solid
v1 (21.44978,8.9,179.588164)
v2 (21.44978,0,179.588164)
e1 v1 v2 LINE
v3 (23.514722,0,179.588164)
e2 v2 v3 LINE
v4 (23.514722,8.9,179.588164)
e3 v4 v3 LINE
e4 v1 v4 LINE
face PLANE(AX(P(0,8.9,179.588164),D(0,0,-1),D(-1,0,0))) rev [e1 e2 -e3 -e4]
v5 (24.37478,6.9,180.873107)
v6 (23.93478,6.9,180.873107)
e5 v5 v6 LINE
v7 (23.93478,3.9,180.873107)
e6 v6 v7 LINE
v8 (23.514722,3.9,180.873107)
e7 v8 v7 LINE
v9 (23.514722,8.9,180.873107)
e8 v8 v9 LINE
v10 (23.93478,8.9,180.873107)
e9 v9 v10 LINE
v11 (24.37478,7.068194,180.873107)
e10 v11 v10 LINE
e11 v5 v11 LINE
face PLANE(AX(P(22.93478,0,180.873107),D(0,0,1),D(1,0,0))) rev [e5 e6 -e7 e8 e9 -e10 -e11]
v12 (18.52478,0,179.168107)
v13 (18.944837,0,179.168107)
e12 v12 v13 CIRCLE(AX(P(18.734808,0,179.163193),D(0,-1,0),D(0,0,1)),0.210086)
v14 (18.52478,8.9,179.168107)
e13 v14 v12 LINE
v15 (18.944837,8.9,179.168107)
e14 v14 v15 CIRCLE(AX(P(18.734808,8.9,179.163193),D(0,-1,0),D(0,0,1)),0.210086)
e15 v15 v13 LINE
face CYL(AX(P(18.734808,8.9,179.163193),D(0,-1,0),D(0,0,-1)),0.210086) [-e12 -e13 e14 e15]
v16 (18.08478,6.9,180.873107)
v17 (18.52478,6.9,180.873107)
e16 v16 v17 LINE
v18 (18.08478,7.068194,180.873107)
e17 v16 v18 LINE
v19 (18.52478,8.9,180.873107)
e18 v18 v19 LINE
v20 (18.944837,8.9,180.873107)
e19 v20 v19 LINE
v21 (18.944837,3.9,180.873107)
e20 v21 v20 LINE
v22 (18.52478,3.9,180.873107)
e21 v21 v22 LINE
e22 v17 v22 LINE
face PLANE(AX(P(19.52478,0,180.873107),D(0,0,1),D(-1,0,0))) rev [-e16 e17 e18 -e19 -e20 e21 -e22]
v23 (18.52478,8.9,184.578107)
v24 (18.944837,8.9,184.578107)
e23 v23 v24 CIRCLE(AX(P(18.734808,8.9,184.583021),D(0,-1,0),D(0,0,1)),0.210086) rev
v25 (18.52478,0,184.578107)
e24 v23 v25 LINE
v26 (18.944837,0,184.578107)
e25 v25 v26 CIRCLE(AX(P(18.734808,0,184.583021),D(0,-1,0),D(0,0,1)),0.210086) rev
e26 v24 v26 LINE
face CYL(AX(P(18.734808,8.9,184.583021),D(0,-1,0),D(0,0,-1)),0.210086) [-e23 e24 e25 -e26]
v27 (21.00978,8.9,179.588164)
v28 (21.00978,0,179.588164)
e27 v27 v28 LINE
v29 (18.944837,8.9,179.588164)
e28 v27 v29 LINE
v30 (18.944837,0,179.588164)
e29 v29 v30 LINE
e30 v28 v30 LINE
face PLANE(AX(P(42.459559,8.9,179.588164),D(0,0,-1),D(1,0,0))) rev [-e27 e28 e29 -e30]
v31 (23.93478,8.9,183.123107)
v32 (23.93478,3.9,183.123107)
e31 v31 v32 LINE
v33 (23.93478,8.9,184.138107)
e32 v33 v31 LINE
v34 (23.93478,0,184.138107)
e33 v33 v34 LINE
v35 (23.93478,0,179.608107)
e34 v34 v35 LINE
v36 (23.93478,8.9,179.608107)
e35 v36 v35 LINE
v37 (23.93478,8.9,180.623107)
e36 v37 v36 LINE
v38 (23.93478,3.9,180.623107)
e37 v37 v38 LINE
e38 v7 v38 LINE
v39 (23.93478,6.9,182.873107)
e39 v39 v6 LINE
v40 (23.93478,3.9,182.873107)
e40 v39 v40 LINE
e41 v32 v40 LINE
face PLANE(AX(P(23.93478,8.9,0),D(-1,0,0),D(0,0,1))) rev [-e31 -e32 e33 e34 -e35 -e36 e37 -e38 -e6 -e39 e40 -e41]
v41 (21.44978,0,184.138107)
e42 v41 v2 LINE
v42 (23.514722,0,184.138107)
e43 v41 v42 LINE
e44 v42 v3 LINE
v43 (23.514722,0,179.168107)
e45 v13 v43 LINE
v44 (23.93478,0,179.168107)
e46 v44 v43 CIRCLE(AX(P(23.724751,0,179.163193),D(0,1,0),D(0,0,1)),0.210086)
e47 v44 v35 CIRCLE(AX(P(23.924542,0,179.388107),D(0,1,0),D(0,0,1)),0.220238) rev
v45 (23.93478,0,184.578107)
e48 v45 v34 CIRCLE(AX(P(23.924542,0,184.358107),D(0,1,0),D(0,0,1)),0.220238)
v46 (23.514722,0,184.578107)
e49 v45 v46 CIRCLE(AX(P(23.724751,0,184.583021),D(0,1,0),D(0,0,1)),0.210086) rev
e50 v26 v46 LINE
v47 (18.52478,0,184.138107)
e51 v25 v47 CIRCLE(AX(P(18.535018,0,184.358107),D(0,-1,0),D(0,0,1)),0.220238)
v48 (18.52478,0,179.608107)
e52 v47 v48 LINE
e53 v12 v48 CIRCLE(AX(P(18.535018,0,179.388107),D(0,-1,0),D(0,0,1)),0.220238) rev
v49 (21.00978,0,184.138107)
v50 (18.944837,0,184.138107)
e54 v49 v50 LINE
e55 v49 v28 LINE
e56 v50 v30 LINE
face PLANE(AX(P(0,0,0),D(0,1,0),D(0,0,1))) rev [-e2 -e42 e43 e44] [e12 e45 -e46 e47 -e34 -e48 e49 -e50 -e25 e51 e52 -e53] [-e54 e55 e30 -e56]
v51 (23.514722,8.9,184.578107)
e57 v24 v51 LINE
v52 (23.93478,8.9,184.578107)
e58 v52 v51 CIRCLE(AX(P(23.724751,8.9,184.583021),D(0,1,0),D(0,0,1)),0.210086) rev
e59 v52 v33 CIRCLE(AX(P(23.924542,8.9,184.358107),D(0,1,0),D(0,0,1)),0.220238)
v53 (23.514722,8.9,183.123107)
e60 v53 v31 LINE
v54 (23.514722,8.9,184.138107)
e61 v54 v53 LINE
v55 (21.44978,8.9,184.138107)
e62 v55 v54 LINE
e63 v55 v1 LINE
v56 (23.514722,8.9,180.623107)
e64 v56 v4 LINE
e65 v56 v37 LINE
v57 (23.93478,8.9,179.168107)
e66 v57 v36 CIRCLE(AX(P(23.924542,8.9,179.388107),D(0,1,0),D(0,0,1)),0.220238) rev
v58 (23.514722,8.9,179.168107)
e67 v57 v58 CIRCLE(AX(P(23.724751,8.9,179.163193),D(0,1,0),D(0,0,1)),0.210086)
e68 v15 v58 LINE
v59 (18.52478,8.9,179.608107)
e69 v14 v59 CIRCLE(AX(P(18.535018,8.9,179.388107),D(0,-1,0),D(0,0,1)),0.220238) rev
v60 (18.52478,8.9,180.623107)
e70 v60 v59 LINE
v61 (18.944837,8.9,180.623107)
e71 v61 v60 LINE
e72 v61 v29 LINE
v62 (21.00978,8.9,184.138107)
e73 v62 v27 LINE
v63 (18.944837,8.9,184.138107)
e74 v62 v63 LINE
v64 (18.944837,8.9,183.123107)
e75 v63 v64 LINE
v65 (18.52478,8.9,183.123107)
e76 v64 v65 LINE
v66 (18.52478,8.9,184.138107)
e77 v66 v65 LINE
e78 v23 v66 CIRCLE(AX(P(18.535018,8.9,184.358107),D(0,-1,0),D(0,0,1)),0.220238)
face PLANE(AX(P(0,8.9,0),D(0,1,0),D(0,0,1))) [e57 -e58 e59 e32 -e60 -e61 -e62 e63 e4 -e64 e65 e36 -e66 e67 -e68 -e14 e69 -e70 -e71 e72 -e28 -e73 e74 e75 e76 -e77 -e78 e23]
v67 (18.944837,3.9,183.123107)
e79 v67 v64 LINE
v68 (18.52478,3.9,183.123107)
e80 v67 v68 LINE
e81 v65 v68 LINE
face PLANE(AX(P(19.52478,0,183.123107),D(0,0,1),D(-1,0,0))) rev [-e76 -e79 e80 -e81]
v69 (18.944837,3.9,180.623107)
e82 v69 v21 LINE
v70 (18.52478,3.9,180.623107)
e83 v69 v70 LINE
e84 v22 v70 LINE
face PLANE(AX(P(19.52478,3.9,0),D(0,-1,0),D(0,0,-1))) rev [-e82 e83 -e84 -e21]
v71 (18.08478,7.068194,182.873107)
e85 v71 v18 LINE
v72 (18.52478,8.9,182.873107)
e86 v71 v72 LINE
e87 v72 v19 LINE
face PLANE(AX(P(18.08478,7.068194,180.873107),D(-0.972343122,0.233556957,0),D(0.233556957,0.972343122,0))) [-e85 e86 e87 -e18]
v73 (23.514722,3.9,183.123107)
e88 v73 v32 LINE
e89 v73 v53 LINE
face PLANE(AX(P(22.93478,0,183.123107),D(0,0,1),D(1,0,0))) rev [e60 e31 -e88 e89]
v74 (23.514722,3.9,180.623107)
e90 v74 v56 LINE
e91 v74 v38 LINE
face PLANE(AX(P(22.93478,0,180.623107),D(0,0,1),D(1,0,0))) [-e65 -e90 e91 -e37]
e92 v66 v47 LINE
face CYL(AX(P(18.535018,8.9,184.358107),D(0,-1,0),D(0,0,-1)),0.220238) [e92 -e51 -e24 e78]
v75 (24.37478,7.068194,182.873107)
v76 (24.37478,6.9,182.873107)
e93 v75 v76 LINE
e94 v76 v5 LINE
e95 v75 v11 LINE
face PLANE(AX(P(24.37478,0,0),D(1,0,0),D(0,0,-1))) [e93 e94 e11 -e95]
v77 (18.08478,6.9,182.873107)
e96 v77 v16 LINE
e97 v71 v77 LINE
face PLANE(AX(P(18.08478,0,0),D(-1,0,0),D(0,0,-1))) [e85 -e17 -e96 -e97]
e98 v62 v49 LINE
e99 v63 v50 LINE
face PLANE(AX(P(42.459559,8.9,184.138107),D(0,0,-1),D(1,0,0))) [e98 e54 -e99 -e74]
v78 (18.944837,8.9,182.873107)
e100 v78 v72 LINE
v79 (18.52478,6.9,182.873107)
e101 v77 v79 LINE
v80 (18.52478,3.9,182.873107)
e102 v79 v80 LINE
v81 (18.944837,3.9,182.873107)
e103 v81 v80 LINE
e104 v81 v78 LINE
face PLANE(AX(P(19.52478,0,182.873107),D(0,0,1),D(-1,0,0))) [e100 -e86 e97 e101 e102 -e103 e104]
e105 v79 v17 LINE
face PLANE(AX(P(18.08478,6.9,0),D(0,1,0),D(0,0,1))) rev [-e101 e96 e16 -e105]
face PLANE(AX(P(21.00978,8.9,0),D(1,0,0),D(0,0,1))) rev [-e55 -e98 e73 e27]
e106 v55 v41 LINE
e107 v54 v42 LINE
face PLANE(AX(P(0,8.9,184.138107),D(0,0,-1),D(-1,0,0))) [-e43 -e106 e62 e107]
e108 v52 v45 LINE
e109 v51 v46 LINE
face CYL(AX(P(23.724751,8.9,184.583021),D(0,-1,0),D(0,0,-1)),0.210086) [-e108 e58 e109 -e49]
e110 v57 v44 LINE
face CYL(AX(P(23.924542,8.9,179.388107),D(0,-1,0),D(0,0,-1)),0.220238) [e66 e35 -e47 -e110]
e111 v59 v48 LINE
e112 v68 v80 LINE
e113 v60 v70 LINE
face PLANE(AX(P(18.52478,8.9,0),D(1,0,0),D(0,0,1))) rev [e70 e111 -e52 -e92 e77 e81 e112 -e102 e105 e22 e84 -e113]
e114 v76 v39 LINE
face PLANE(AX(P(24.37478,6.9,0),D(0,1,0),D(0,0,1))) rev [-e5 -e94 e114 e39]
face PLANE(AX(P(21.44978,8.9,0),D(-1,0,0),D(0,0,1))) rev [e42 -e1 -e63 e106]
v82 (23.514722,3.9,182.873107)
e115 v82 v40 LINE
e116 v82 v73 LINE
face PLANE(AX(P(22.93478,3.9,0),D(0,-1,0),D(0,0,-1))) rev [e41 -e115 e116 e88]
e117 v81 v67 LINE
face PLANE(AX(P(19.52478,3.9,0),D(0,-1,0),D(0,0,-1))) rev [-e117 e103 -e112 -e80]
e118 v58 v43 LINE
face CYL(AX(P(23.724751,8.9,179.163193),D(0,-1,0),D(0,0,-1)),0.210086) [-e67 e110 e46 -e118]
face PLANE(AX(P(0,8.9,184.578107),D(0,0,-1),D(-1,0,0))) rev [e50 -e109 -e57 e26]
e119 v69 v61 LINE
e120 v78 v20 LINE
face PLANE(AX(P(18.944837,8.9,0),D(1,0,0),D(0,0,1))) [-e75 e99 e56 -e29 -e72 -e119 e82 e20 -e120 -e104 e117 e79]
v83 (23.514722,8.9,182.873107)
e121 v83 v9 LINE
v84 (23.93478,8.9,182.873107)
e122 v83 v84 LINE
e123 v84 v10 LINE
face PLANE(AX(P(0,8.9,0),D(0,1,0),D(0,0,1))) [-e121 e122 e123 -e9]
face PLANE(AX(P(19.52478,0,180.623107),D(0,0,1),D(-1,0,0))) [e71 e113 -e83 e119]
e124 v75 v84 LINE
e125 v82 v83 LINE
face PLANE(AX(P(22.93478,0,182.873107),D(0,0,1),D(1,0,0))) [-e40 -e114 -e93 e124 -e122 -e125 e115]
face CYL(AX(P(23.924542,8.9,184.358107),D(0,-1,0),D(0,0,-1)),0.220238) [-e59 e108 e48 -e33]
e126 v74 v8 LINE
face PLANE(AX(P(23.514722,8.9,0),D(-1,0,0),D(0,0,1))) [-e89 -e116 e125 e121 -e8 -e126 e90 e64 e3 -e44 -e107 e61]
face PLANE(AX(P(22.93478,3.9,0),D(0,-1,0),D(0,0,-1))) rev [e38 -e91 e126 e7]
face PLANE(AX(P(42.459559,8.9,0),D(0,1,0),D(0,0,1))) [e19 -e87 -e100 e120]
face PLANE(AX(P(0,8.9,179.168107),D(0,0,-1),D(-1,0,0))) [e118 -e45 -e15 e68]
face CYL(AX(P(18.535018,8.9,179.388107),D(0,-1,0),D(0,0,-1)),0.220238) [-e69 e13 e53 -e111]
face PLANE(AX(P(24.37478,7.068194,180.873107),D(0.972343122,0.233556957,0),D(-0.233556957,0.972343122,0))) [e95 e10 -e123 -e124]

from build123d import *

# Parameters (mm, degrees)
SKETCH1_W            = 5.41
SKETCH1_H            = 5.41
SKETCH1_W_2          = 4.549942703
SKETCH1_H_2          = 4.549942703
SKETCH1_W_3          = 0.44
BOSS_EXTRUDE8_DEPTH  = 8.9
SKETCH2_W            = 0.25
SKETCH2_H            = 3.415060647
SKETCH2_H_2          = 1.584939353
CUT_EXTRUDE1_DEPTH   = 1
SKETCH3_W            = 2
SKETCH3_H            = 0.168194263
BOSS_EXTRUDE9_DEPTH  = 0.44
BOSS_EXTRUDE10_DEPTH = 2
SKETCH6_W            = 3.011984057
SKETCH6_H            = 5.99945952
CUT_EXTRUDE2_DEPTH   = 10


# Read off the part's stored shape, not the designer's step: Mirror10
with BuildPart() as part:
    # Sketch1 → Boss-Extrude8 (new body)
    # profile 1 of 10: a face of its own
    with BuildSketch(Plane(origin=(61.037479951, 0, 196.423934756), x_dir=(1, 0, 0), z_dir=(0, 1, 0))):
        with Locations((-39.807700339, 14.550827763)):
            Rectangle(SKETCH1_W, SKETCH1_H)
        with Locations((-39.797728988, 14.560799114)):
            Rectangle(SKETCH1_W_2, SKETCH1_H_2, mode=Mode.SUBTRACT)
    # profile 2 of 10: a face of its own
    with BuildSketch(Plane(origin=(61.037479951, 0, 196.423934756), x_dir=(1, 0, 0), z_dir=(0, 1, 0))):
        with Locations((-39.807700339, 14.560799114)):
            Rectangle(SKETCH1_W_3, SKETCH1_H_2)
    # profile 3 of 10: a face of its own
    with BuildSketch(Plane(origin=(61.037479951, 0, 196.423934756), x_dir=(1, 0, 0), z_dir=(0, 1, 0))):
        with BuildLine():
            ThreePointArc((-42.092643043, 17.255827763), (-42.302671691, 17.470827763), (-42.512700339, 17.255827763))
            Line((-42.512700339, 17.255827763), (-42.092643043, 17.255827763))
        make_face()
    # profile 4 of 10: a face of its own
    with BuildSketch(Plane(origin=(61.037479951, 0, 196.423934756), x_dir=(1, 0, 0), z_dir=(0, 1, 0))):
        with BuildLine():
            ThreePointArc((-42.512700339, 17.255827763), (-42.722700339, 17.035827763), (-42.512700339, 16.815827763))
            Line((-42.512700339, 16.815827763), (-42.512700339, 17.255827763))
        make_face()
    # profile 5 of 10: a face of its own
    with BuildSketch(Plane(origin=(61.037479951, 0, 196.423934756), x_dir=(1, 0, 0), z_dir=(0, 1, 0))):
        with BuildLine():
            ThreePointArc((-42.512700339, 12.285827763), (-42.722700339, 12.065827763), (-42.512700339, 11.845827763))
            Line((-42.512700339, 11.845827763), (-42.512700339, 12.285827763))
        make_face()
    # profile 6 of 10: a face of its own
    with BuildSketch(Plane(origin=(61.037479951, 0, 196.423934756), x_dir=(1, 0, 0), z_dir=(0, 1, 0))):
        with BuildLine():
            Line((-42.092643043, 11.845827763), (-42.512700339, 11.845827763))
            ThreePointArc((-42.512700339, 11.845827763), (-42.302671691, 11.630827763), (-42.092643043, 11.845827763))
        make_face()
    # profile 7 of 10: a face of its own
    with BuildSketch(Plane(origin=(61.037479951, 0, 196.423934756), x_dir=(1, 0, 0), z_dir=(0, 1, 0))):
        with BuildLine():
            Line((-37.102700339, 11.845827763), (-37.522757636, 11.845827763))
            ThreePointArc((-37.522757636, 11.845827763), (-37.312728988, 11.630827763), (-37.102700339, 11.845827763))
        make_face()
    # profile 8 of 10: a face of its own
    with BuildSketch(Plane(origin=(61.037479951, 0, 196.423934756), x_dir=(1, 0, 0), z_dir=(0, 1, 0))):
        with BuildLine():
            Line((-37.102700339, 12.285827763), (-37.102700339, 11.845827763))
            ThreePointArc((-37.102700339, 11.845827763), (-36.892700339, 12.065827763), (-37.102700339, 12.285827763))
        make_face()
    # profile 9 of 10: a face of its own
    with BuildSketch(Plane(origin=(61.037479951, 0, 196.423934756), x_dir=(1, 0, 0), z_dir=(0, 1, 0))):
        with BuildLine():
            ThreePointArc((-37.102700339, 17.255827763), (-37.312728988, 17.470827763), (-37.522757636, 17.255827763))
            Line((-37.522757636, 17.255827763), (-37.102700339, 17.255827763))
        make_face()
    # profile 10 of 10: a face of its own
    with BuildSketch(Plane(origin=(61.037479951, 0, 196.423934756), x_dir=(1, 0, 0), z_dir=(0, 1, 0))):
        with BuildLine():
            Line((-37.102700339, 17.255827763), (-37.102700339, 16.815827763))
            ThreePointArc((-37.102700339, 16.815827763), (-36.892700339, 17.035827763), (-37.102700339, 17.255827763))
        make_face()
    extrude(amount=BOSS_EXTRUDE8_DEPTH)

    # Sketch2 → Cut-Extrude1 (cut)
    with BuildSketch(Plane(origin=(23.934779612, 0, 196.423934756), x_dir=(0, 0, -1), z_dir=(1, 0, 0))):
        with Locations((13.425827763, 5.607530324)):
            Rectangle(SKETCH2_W, SKETCH2_H)
        with Locations((13.425827763, 8.107530324)):
            Rectangle(SKETCH2_W, SKETCH2_H_2)
        with Locations((15.675827763, 8.107530324)):
            Rectangle(SKETCH2_W, SKETCH2_H_2)
        with Locations((15.675827763, 5.607530324)):
            Rectangle(SKETCH2_W, SKETCH2_H)
    extrude(amount=-CUT_EXTRUDE1_DEPTH, mode=Mode.SUBTRACT)

    # Sketch3 → Boss-Extrude9 (add)
    with BuildSketch(Plane(origin=(23.934779612, 0, 196.423934756), x_dir=(0, 0, -1), z_dir=(1, 0, 0))):
        with Locations((14.550827763, 6.984097132)):
            Rectangle(SKETCH3_W, SKETCH3_H)
    extrude(amount=BOSS_EXTRUDE9_DEPTH)

    # Sketch5 → Boss-Extrude10 (add)
    with BuildSketch(Plane(origin=(61.037479951, 0, 182.873106993), x_dir=(1, 0, 0), z_dir=(0, 0, 1))):
        Polygon((-36.662700339, 7.068194263), (-37.102700339, 8.9), (-37.102700339, 7.068194263), align=None)
    extrude(amount=-BOSS_EXTRUDE10_DEPTH)

    # Sketch6 → Cut-Extrude2 (cut)
    with BuildSketch(Plane(origin=(61.037479951, 8.9, 196.423934756), x_dir=(1, 0, 0), z_dir=(0, 1, 0))):
        with Locations((-41.313692367, 14.541370124)):
            Rectangle(SKETCH6_W, SKETCH6_H)
    extrude(amount=-CUT_EXTRUDE2_DEPTH, mode=Mode.SUBTRACT)

    # Mirror10: part across plane


with BuildPart() as part_1:
    add(part.part)
    add(part.part.mirror(Plane(origin=(21.229779612, -1.1, 178.882834872), x_dir=(0, 0, 1), z_dir=(1, 0, 0))))


solid = part_1.part
